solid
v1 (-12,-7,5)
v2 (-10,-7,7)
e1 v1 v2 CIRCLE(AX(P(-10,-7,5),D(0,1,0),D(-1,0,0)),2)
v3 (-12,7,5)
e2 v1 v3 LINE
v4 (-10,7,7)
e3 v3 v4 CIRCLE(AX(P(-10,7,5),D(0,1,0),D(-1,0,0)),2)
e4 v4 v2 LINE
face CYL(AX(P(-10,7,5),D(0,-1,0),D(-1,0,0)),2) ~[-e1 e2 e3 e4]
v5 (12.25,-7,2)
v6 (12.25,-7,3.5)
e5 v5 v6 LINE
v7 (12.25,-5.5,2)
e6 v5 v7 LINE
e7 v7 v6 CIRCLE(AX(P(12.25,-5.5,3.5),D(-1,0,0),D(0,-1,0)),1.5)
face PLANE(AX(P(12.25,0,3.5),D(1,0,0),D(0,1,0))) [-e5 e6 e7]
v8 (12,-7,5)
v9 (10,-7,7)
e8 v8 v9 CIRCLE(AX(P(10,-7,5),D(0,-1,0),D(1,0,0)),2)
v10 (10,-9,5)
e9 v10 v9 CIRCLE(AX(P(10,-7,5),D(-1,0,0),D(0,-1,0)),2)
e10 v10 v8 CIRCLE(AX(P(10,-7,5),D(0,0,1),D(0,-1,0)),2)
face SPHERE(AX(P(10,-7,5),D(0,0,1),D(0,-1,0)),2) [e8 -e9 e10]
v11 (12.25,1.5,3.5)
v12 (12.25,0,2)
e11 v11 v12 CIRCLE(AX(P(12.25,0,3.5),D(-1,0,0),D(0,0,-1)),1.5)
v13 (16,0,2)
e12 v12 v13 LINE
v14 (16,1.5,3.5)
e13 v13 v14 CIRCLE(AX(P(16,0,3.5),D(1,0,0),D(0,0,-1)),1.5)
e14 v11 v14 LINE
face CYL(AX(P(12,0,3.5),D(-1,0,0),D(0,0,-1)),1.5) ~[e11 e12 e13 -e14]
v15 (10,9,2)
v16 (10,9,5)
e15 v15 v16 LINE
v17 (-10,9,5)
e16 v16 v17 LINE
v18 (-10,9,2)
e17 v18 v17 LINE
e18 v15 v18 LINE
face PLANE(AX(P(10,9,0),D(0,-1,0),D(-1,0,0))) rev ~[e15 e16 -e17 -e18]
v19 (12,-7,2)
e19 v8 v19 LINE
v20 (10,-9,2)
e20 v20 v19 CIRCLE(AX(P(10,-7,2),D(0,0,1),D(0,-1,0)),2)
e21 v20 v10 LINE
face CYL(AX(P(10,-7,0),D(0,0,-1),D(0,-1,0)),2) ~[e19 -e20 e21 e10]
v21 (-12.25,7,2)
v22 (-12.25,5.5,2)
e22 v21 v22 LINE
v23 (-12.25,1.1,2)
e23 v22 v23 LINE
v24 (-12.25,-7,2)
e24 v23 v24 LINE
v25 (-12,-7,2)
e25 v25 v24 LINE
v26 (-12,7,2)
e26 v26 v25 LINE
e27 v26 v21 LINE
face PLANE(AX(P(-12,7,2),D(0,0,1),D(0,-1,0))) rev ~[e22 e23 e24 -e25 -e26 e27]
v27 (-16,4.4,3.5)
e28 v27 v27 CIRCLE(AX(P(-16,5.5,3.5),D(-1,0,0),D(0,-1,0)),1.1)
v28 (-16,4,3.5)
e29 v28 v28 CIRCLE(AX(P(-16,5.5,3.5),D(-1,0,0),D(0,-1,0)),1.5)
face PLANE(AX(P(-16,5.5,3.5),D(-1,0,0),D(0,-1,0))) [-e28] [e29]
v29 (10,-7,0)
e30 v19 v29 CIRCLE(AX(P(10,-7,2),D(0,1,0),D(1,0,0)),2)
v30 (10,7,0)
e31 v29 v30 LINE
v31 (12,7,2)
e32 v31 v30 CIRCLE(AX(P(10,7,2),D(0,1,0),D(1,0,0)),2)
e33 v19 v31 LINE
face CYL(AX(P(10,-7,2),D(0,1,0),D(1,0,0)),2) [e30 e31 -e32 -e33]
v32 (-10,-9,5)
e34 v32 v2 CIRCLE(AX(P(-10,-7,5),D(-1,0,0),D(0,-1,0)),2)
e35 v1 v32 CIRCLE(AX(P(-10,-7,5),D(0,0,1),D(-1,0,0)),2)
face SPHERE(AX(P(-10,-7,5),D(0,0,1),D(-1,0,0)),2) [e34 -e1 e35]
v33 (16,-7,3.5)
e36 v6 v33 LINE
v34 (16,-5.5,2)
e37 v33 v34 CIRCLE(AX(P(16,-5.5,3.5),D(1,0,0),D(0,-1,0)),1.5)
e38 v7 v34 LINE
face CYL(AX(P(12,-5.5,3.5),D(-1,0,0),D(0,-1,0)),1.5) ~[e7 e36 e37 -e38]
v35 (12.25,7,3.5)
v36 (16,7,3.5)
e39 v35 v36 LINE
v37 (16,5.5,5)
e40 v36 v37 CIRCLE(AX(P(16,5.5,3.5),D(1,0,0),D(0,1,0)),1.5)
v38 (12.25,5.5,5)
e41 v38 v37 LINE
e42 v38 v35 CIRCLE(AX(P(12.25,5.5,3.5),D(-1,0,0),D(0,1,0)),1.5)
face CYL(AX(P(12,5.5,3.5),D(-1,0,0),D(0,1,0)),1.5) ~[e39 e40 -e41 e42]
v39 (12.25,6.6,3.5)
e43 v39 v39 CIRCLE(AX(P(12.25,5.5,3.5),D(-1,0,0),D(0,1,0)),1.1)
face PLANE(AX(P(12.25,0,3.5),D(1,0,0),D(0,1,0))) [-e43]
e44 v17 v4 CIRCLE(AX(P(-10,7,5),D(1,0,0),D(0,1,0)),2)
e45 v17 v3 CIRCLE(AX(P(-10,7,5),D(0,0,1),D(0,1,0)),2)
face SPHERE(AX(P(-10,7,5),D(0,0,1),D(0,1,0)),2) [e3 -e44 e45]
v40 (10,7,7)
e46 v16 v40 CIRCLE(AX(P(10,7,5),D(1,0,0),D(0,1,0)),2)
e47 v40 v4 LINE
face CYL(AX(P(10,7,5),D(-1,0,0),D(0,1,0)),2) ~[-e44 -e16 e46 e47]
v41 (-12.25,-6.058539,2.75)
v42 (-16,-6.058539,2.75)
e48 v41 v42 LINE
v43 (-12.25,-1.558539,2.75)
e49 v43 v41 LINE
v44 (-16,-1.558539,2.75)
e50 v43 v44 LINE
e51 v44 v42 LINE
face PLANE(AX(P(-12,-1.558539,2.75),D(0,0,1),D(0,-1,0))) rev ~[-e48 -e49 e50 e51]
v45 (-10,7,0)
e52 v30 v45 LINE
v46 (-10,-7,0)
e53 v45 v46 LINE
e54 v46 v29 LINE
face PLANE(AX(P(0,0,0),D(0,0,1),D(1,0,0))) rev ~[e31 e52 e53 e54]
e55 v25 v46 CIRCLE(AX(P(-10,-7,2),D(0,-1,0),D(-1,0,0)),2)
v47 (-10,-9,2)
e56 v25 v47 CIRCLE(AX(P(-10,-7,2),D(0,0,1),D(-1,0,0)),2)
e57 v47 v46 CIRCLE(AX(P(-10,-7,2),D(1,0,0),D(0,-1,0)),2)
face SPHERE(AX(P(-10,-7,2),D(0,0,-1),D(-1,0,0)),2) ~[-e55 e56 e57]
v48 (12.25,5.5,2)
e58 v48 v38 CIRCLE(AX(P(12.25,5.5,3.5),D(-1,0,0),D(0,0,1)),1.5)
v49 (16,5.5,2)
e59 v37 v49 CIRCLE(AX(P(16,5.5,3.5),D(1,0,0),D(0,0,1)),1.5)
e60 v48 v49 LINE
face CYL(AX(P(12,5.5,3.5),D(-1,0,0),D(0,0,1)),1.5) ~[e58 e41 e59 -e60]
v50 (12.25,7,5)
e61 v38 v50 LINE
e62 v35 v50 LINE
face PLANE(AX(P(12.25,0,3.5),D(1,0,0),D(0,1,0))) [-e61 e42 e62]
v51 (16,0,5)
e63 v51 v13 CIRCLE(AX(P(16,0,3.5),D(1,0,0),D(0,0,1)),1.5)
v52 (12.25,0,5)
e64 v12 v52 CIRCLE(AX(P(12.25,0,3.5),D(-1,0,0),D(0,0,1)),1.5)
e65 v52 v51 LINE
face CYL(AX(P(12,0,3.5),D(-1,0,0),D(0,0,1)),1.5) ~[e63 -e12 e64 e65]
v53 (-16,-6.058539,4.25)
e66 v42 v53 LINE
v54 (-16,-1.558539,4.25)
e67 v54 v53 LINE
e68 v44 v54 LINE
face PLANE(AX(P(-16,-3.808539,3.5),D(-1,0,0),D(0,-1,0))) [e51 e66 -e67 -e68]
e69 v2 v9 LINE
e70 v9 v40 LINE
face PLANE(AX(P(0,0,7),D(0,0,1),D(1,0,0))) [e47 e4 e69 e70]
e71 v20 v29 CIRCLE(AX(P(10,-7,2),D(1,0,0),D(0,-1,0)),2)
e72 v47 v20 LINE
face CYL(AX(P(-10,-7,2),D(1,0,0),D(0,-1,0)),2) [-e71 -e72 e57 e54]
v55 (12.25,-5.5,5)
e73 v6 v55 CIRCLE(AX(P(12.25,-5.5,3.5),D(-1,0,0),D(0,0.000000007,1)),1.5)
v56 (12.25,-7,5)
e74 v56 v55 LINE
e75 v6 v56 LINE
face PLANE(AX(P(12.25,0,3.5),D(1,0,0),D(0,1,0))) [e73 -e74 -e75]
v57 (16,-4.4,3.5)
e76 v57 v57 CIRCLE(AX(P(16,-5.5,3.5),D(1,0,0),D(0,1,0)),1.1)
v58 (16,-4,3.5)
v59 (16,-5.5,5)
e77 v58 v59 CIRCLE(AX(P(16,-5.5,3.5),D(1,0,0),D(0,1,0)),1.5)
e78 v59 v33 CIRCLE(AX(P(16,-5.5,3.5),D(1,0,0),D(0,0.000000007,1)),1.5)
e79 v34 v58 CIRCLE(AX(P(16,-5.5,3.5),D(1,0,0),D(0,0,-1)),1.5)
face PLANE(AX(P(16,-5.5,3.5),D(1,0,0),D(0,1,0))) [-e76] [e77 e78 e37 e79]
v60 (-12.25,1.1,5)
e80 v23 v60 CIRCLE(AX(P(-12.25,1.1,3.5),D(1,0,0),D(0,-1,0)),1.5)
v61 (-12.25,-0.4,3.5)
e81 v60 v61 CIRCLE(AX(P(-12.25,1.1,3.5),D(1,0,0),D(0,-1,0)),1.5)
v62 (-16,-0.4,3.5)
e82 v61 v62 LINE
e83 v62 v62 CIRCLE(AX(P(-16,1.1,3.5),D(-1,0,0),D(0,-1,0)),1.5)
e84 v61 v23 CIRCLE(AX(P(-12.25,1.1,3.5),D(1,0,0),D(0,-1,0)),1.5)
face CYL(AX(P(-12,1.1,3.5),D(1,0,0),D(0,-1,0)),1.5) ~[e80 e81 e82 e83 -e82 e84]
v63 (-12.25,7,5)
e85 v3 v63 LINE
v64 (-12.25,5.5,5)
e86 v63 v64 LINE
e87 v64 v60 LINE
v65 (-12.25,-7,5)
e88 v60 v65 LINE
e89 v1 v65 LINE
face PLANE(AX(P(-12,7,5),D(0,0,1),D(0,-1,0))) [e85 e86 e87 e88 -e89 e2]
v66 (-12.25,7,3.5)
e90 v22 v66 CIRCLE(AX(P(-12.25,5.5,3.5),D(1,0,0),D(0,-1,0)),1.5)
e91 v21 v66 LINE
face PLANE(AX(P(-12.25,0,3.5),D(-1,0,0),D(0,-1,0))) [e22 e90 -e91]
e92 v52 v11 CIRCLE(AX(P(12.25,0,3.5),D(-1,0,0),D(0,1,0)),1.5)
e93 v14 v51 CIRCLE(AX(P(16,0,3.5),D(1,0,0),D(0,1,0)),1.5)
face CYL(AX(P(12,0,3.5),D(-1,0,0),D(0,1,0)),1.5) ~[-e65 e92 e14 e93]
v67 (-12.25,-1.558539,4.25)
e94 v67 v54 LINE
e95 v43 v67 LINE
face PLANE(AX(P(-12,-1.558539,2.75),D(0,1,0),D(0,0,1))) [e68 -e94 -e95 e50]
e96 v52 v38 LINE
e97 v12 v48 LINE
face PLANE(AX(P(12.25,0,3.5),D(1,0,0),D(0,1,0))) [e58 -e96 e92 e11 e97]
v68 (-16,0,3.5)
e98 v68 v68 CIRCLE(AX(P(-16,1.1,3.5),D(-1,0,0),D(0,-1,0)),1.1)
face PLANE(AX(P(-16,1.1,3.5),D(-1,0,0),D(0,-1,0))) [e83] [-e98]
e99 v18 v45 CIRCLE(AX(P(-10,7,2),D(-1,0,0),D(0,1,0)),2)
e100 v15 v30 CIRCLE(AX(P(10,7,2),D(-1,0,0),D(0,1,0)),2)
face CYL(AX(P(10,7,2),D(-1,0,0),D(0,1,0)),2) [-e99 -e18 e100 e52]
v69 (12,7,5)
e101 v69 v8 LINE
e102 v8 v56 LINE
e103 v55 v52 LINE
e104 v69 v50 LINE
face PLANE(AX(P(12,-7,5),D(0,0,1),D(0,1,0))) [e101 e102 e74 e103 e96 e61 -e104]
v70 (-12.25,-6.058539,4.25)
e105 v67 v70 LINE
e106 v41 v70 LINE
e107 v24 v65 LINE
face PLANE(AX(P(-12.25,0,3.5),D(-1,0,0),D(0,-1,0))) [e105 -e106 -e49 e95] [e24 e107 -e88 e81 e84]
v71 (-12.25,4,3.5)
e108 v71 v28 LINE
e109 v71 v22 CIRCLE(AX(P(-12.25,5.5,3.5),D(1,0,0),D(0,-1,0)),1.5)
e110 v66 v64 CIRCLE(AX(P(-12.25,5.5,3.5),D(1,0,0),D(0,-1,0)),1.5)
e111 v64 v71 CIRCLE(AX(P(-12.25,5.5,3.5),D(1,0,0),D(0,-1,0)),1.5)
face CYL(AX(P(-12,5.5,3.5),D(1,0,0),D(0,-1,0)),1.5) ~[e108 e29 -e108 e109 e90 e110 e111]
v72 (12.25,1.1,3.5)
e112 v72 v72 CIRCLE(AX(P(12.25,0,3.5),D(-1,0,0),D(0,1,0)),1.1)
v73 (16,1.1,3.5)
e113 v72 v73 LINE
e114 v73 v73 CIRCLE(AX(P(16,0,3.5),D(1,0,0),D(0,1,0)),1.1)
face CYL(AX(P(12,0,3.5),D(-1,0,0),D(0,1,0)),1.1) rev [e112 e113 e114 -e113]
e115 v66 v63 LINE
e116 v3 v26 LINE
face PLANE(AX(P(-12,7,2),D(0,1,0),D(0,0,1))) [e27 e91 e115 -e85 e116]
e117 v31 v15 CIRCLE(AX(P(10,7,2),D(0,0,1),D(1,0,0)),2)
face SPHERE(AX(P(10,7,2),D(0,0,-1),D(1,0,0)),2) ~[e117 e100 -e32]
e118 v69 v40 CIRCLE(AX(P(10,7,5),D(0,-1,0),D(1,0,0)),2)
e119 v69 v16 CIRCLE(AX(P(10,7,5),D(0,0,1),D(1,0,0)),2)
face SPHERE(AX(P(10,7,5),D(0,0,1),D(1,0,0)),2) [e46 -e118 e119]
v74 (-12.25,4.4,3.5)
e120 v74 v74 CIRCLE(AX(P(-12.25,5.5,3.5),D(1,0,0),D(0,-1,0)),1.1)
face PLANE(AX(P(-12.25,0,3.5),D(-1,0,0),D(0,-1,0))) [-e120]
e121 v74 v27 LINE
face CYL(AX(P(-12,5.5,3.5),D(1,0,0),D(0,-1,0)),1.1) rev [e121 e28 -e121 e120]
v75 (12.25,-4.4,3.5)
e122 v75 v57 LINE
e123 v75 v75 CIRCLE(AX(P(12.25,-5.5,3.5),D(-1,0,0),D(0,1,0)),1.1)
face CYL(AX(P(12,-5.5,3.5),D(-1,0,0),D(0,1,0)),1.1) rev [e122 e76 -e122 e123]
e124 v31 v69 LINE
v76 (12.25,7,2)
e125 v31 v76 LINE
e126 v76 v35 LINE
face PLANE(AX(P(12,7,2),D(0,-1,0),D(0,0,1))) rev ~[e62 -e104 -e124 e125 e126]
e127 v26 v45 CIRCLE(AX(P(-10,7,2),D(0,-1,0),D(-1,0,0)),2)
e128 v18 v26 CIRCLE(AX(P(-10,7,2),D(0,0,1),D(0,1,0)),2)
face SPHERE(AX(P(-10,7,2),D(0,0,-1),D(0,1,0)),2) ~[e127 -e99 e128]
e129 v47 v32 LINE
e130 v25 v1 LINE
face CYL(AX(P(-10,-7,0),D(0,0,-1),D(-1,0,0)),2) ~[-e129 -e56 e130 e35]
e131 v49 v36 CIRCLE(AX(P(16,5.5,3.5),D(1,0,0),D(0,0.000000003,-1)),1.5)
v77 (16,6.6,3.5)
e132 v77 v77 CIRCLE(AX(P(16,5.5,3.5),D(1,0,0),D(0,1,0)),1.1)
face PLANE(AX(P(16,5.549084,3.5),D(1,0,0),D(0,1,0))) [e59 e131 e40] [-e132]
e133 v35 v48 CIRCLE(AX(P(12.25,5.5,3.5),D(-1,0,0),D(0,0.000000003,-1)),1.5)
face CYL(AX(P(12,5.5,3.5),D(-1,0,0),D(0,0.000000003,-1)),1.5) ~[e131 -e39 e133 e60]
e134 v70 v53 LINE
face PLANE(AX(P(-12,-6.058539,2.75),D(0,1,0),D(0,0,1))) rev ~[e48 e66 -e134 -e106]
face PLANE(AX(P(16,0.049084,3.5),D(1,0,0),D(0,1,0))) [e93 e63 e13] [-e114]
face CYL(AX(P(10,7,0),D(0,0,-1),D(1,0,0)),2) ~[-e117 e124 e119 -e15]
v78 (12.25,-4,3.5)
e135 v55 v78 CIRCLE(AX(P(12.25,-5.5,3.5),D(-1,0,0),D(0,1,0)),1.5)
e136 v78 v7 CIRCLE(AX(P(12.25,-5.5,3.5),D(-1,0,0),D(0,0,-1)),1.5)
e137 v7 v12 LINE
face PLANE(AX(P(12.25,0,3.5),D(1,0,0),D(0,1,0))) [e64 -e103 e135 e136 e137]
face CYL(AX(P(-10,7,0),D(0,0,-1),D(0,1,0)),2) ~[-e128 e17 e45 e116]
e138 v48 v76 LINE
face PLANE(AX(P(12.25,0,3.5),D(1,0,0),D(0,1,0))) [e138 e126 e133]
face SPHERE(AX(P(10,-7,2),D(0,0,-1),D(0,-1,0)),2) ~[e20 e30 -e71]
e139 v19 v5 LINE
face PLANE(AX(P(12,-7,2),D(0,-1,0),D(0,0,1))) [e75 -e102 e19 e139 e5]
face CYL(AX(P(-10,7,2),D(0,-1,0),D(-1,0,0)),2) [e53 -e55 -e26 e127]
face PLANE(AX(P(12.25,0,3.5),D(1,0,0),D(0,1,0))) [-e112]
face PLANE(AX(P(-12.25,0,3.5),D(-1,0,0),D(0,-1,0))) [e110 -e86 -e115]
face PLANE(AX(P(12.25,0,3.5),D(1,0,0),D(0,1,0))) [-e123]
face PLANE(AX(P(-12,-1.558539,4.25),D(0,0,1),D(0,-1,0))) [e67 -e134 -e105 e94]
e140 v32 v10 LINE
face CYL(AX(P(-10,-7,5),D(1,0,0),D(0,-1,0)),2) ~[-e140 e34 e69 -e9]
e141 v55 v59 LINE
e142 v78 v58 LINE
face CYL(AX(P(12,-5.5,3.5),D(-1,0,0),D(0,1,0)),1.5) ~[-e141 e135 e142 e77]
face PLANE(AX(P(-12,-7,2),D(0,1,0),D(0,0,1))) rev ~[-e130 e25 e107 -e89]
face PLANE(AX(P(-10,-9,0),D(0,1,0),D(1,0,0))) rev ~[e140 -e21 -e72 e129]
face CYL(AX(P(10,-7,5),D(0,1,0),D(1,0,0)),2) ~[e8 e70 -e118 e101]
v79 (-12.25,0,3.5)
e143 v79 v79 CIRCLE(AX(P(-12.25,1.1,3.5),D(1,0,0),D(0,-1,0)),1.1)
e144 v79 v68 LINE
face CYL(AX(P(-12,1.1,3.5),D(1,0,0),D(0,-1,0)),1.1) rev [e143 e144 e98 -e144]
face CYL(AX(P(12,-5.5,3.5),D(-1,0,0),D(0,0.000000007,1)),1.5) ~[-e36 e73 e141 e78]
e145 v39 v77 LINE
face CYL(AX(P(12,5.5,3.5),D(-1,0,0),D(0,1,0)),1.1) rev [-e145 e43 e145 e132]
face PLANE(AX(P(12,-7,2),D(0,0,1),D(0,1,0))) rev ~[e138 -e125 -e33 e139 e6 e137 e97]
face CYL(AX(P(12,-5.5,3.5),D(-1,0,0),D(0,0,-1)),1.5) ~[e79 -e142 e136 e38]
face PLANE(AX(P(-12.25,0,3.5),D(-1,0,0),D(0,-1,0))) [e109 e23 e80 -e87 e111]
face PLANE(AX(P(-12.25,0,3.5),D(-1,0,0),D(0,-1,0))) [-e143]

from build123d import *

# Parameters (mm, degrees)
F1_DEPTH  = 7
F2_R      = 2
F3_R      = 1.1
F4_DEPTH  = 4
F5_R      = 1.5
F5_R_2    = 1.1
F5_W      = 4.5
F5_H      = 1.5
F6_DEPTH  = 4
F7_W      = 14
F7_H      = 3
F8_DEPTH  = 0.25
F9_W      = 14
F9_H      = 3
F9_R      = 1.1
F10_DEPTH = 0.25


with BuildPart() as f1:
    # F0 (on Top) → F1 (new body)
    with BuildSketch(Plane.XY):
        with BuildLine():
            ThreePointArc((12, 7), (11.4142135624, 8.4142135624), (10, 9))
            Line((10, 9), (-10, 9))
            ThreePointArc((-10, 9), (-11.4142135624, 8.4142135624), (-12, 7))
            Line((-12, 7), (-12, -7))
            ThreePointArc((-12, -7), (-11.4142135624, -8.4142135624), (-10, -9))
            Line((-10, -9), (10, -9))
            ThreePointArc((10, -9), (11.4142135624, -8.4142135624), (12, -7))
            Line((12, -7), (12, 7))
        make_face()
    extrude(amount=F1_DEPTH)

    # F2
    f2_edges = [f1.edges().sort_by_distance(p)[0] for p in [
        (11.414214, 8.414214, 7),
        (0, 9, 7),
        (-11.414214, 8.414214, 7),
        (-12, 0, 7),
        (-11.414214, -8.414214, 7),
        (0, -9, 7),
        (11.414214, -8.414214, 7),
        (12, 0, 7),
        (11.414214, 8.414214, 0),
        (0, 9, 0),
        (-11.414214, 8.414214, 0),
        (-12, 0, 0),
        (-11.414214, -8.414214, 0),
        (0, -9, 0),
        (11.414214, -8.414214, 0),
        (12, 0, 0),
    ]]
    fillet(f2_edges, radius=F2_R)

    # F3 (on face) → F4 (join)
    with BuildSketch(Plane.YZ.offset(12)):
        with BuildLine():
            ThreePointArc((-4, 3.5), (-4.4393398246, 4.5606601681), (-5.4999999897, 5))
            ThreePointArc((-5.4999999897, 5), (-6.5606601681, 4.5606601754), (-7, 3.5))
            ThreePointArc((-7, 3.5), (-6.5606601718, 2.4393398282), (-5.5, 2))
            ThreePointArc((-5.5, 2), (-4.4393398282, 2.4393398282), (-4, 3.5))
        make_face()
        with Locations((-5.5, 3.5)):
            Circle(F3_R, mode=Mode.SUBTRACT)
        with BuildLine():
            ThreePointArc((0, 2), (1.0606601718, 2.4393398282), (1.5, 3.5))
            ThreePointArc((1.5, 3.5), (1.0606601718, 4.5606601718), (0, 5))
            ThreePointArc((0, 5), (-1.5, 3.5), (0, 2))
        make_face()
        with Locations((0, 3.5)):
            Circle(F3_R, mode=Mode.SUBTRACT)
        with BuildLine():
            ThreePointArc((7, 3.5), (6.5606601718, 4.5606601718), (5.5, 5))
            ThreePointArc((5.5, 5), (4, 3.499999998), (5.5000000039, 2))
            ThreePointArc((5.5000000039, 2), (6.5606601732, 2.4393398296), (7, 3.5))
        make_face()
        with Locations((5.5, 3.5)):
            Circle(F3_R, mode=Mode.SUBTRACT)
    extrude(amount=F4_DEPTH)

    # F5 (on face) → F6 (join)
    with BuildSketch(Plane(origin=(-12, 0, 0), x_dir=(0, -1, 0), z_dir=(-1, 0, 0))):
        with Locations((-5.5, 3.5)):
            Circle(F5_R)
        with Locations((-5.5, 3.5)):
            Circle(F5_R_2, mode=Mode.SUBTRACT)
        with Locations((-1.1, 3.5)):
            Circle(F5_R)
        with Locations((-1.1, 3.5)):
            Circle(F5_R_2, mode=Mode.SUBTRACT)
        with Locations((3.8085386623, 3.5)):
            Rectangle(F5_W, F5_H)
    extrude(amount=F6_DEPTH)

    # F7 (on face) → F8 (join)
    with BuildSketch(Plane.YZ.offset(12)):
        with Locations((0, 3.5)):
            Rectangle(F7_W, F7_H)
    extrude(amount=F8_DEPTH)

    # F9 (on face) → F10 (join)
    with BuildSketch(Plane(origin=(-12, 0, 0), x_dir=(0, -1, 0), z_dir=(-1, 0, 0))):
        with Locations((0, 3.5)):
            Rectangle(F9_W, F9_H)
        with Locations((-1.1, 3.5)):
            Circle(F9_R, mode=Mode.SUBTRACT)
        with Locations((-1.1, 3.5)):
            Circle(F9_R)
    extrude(amount=F10_DEPTH)


solid = f1.part
